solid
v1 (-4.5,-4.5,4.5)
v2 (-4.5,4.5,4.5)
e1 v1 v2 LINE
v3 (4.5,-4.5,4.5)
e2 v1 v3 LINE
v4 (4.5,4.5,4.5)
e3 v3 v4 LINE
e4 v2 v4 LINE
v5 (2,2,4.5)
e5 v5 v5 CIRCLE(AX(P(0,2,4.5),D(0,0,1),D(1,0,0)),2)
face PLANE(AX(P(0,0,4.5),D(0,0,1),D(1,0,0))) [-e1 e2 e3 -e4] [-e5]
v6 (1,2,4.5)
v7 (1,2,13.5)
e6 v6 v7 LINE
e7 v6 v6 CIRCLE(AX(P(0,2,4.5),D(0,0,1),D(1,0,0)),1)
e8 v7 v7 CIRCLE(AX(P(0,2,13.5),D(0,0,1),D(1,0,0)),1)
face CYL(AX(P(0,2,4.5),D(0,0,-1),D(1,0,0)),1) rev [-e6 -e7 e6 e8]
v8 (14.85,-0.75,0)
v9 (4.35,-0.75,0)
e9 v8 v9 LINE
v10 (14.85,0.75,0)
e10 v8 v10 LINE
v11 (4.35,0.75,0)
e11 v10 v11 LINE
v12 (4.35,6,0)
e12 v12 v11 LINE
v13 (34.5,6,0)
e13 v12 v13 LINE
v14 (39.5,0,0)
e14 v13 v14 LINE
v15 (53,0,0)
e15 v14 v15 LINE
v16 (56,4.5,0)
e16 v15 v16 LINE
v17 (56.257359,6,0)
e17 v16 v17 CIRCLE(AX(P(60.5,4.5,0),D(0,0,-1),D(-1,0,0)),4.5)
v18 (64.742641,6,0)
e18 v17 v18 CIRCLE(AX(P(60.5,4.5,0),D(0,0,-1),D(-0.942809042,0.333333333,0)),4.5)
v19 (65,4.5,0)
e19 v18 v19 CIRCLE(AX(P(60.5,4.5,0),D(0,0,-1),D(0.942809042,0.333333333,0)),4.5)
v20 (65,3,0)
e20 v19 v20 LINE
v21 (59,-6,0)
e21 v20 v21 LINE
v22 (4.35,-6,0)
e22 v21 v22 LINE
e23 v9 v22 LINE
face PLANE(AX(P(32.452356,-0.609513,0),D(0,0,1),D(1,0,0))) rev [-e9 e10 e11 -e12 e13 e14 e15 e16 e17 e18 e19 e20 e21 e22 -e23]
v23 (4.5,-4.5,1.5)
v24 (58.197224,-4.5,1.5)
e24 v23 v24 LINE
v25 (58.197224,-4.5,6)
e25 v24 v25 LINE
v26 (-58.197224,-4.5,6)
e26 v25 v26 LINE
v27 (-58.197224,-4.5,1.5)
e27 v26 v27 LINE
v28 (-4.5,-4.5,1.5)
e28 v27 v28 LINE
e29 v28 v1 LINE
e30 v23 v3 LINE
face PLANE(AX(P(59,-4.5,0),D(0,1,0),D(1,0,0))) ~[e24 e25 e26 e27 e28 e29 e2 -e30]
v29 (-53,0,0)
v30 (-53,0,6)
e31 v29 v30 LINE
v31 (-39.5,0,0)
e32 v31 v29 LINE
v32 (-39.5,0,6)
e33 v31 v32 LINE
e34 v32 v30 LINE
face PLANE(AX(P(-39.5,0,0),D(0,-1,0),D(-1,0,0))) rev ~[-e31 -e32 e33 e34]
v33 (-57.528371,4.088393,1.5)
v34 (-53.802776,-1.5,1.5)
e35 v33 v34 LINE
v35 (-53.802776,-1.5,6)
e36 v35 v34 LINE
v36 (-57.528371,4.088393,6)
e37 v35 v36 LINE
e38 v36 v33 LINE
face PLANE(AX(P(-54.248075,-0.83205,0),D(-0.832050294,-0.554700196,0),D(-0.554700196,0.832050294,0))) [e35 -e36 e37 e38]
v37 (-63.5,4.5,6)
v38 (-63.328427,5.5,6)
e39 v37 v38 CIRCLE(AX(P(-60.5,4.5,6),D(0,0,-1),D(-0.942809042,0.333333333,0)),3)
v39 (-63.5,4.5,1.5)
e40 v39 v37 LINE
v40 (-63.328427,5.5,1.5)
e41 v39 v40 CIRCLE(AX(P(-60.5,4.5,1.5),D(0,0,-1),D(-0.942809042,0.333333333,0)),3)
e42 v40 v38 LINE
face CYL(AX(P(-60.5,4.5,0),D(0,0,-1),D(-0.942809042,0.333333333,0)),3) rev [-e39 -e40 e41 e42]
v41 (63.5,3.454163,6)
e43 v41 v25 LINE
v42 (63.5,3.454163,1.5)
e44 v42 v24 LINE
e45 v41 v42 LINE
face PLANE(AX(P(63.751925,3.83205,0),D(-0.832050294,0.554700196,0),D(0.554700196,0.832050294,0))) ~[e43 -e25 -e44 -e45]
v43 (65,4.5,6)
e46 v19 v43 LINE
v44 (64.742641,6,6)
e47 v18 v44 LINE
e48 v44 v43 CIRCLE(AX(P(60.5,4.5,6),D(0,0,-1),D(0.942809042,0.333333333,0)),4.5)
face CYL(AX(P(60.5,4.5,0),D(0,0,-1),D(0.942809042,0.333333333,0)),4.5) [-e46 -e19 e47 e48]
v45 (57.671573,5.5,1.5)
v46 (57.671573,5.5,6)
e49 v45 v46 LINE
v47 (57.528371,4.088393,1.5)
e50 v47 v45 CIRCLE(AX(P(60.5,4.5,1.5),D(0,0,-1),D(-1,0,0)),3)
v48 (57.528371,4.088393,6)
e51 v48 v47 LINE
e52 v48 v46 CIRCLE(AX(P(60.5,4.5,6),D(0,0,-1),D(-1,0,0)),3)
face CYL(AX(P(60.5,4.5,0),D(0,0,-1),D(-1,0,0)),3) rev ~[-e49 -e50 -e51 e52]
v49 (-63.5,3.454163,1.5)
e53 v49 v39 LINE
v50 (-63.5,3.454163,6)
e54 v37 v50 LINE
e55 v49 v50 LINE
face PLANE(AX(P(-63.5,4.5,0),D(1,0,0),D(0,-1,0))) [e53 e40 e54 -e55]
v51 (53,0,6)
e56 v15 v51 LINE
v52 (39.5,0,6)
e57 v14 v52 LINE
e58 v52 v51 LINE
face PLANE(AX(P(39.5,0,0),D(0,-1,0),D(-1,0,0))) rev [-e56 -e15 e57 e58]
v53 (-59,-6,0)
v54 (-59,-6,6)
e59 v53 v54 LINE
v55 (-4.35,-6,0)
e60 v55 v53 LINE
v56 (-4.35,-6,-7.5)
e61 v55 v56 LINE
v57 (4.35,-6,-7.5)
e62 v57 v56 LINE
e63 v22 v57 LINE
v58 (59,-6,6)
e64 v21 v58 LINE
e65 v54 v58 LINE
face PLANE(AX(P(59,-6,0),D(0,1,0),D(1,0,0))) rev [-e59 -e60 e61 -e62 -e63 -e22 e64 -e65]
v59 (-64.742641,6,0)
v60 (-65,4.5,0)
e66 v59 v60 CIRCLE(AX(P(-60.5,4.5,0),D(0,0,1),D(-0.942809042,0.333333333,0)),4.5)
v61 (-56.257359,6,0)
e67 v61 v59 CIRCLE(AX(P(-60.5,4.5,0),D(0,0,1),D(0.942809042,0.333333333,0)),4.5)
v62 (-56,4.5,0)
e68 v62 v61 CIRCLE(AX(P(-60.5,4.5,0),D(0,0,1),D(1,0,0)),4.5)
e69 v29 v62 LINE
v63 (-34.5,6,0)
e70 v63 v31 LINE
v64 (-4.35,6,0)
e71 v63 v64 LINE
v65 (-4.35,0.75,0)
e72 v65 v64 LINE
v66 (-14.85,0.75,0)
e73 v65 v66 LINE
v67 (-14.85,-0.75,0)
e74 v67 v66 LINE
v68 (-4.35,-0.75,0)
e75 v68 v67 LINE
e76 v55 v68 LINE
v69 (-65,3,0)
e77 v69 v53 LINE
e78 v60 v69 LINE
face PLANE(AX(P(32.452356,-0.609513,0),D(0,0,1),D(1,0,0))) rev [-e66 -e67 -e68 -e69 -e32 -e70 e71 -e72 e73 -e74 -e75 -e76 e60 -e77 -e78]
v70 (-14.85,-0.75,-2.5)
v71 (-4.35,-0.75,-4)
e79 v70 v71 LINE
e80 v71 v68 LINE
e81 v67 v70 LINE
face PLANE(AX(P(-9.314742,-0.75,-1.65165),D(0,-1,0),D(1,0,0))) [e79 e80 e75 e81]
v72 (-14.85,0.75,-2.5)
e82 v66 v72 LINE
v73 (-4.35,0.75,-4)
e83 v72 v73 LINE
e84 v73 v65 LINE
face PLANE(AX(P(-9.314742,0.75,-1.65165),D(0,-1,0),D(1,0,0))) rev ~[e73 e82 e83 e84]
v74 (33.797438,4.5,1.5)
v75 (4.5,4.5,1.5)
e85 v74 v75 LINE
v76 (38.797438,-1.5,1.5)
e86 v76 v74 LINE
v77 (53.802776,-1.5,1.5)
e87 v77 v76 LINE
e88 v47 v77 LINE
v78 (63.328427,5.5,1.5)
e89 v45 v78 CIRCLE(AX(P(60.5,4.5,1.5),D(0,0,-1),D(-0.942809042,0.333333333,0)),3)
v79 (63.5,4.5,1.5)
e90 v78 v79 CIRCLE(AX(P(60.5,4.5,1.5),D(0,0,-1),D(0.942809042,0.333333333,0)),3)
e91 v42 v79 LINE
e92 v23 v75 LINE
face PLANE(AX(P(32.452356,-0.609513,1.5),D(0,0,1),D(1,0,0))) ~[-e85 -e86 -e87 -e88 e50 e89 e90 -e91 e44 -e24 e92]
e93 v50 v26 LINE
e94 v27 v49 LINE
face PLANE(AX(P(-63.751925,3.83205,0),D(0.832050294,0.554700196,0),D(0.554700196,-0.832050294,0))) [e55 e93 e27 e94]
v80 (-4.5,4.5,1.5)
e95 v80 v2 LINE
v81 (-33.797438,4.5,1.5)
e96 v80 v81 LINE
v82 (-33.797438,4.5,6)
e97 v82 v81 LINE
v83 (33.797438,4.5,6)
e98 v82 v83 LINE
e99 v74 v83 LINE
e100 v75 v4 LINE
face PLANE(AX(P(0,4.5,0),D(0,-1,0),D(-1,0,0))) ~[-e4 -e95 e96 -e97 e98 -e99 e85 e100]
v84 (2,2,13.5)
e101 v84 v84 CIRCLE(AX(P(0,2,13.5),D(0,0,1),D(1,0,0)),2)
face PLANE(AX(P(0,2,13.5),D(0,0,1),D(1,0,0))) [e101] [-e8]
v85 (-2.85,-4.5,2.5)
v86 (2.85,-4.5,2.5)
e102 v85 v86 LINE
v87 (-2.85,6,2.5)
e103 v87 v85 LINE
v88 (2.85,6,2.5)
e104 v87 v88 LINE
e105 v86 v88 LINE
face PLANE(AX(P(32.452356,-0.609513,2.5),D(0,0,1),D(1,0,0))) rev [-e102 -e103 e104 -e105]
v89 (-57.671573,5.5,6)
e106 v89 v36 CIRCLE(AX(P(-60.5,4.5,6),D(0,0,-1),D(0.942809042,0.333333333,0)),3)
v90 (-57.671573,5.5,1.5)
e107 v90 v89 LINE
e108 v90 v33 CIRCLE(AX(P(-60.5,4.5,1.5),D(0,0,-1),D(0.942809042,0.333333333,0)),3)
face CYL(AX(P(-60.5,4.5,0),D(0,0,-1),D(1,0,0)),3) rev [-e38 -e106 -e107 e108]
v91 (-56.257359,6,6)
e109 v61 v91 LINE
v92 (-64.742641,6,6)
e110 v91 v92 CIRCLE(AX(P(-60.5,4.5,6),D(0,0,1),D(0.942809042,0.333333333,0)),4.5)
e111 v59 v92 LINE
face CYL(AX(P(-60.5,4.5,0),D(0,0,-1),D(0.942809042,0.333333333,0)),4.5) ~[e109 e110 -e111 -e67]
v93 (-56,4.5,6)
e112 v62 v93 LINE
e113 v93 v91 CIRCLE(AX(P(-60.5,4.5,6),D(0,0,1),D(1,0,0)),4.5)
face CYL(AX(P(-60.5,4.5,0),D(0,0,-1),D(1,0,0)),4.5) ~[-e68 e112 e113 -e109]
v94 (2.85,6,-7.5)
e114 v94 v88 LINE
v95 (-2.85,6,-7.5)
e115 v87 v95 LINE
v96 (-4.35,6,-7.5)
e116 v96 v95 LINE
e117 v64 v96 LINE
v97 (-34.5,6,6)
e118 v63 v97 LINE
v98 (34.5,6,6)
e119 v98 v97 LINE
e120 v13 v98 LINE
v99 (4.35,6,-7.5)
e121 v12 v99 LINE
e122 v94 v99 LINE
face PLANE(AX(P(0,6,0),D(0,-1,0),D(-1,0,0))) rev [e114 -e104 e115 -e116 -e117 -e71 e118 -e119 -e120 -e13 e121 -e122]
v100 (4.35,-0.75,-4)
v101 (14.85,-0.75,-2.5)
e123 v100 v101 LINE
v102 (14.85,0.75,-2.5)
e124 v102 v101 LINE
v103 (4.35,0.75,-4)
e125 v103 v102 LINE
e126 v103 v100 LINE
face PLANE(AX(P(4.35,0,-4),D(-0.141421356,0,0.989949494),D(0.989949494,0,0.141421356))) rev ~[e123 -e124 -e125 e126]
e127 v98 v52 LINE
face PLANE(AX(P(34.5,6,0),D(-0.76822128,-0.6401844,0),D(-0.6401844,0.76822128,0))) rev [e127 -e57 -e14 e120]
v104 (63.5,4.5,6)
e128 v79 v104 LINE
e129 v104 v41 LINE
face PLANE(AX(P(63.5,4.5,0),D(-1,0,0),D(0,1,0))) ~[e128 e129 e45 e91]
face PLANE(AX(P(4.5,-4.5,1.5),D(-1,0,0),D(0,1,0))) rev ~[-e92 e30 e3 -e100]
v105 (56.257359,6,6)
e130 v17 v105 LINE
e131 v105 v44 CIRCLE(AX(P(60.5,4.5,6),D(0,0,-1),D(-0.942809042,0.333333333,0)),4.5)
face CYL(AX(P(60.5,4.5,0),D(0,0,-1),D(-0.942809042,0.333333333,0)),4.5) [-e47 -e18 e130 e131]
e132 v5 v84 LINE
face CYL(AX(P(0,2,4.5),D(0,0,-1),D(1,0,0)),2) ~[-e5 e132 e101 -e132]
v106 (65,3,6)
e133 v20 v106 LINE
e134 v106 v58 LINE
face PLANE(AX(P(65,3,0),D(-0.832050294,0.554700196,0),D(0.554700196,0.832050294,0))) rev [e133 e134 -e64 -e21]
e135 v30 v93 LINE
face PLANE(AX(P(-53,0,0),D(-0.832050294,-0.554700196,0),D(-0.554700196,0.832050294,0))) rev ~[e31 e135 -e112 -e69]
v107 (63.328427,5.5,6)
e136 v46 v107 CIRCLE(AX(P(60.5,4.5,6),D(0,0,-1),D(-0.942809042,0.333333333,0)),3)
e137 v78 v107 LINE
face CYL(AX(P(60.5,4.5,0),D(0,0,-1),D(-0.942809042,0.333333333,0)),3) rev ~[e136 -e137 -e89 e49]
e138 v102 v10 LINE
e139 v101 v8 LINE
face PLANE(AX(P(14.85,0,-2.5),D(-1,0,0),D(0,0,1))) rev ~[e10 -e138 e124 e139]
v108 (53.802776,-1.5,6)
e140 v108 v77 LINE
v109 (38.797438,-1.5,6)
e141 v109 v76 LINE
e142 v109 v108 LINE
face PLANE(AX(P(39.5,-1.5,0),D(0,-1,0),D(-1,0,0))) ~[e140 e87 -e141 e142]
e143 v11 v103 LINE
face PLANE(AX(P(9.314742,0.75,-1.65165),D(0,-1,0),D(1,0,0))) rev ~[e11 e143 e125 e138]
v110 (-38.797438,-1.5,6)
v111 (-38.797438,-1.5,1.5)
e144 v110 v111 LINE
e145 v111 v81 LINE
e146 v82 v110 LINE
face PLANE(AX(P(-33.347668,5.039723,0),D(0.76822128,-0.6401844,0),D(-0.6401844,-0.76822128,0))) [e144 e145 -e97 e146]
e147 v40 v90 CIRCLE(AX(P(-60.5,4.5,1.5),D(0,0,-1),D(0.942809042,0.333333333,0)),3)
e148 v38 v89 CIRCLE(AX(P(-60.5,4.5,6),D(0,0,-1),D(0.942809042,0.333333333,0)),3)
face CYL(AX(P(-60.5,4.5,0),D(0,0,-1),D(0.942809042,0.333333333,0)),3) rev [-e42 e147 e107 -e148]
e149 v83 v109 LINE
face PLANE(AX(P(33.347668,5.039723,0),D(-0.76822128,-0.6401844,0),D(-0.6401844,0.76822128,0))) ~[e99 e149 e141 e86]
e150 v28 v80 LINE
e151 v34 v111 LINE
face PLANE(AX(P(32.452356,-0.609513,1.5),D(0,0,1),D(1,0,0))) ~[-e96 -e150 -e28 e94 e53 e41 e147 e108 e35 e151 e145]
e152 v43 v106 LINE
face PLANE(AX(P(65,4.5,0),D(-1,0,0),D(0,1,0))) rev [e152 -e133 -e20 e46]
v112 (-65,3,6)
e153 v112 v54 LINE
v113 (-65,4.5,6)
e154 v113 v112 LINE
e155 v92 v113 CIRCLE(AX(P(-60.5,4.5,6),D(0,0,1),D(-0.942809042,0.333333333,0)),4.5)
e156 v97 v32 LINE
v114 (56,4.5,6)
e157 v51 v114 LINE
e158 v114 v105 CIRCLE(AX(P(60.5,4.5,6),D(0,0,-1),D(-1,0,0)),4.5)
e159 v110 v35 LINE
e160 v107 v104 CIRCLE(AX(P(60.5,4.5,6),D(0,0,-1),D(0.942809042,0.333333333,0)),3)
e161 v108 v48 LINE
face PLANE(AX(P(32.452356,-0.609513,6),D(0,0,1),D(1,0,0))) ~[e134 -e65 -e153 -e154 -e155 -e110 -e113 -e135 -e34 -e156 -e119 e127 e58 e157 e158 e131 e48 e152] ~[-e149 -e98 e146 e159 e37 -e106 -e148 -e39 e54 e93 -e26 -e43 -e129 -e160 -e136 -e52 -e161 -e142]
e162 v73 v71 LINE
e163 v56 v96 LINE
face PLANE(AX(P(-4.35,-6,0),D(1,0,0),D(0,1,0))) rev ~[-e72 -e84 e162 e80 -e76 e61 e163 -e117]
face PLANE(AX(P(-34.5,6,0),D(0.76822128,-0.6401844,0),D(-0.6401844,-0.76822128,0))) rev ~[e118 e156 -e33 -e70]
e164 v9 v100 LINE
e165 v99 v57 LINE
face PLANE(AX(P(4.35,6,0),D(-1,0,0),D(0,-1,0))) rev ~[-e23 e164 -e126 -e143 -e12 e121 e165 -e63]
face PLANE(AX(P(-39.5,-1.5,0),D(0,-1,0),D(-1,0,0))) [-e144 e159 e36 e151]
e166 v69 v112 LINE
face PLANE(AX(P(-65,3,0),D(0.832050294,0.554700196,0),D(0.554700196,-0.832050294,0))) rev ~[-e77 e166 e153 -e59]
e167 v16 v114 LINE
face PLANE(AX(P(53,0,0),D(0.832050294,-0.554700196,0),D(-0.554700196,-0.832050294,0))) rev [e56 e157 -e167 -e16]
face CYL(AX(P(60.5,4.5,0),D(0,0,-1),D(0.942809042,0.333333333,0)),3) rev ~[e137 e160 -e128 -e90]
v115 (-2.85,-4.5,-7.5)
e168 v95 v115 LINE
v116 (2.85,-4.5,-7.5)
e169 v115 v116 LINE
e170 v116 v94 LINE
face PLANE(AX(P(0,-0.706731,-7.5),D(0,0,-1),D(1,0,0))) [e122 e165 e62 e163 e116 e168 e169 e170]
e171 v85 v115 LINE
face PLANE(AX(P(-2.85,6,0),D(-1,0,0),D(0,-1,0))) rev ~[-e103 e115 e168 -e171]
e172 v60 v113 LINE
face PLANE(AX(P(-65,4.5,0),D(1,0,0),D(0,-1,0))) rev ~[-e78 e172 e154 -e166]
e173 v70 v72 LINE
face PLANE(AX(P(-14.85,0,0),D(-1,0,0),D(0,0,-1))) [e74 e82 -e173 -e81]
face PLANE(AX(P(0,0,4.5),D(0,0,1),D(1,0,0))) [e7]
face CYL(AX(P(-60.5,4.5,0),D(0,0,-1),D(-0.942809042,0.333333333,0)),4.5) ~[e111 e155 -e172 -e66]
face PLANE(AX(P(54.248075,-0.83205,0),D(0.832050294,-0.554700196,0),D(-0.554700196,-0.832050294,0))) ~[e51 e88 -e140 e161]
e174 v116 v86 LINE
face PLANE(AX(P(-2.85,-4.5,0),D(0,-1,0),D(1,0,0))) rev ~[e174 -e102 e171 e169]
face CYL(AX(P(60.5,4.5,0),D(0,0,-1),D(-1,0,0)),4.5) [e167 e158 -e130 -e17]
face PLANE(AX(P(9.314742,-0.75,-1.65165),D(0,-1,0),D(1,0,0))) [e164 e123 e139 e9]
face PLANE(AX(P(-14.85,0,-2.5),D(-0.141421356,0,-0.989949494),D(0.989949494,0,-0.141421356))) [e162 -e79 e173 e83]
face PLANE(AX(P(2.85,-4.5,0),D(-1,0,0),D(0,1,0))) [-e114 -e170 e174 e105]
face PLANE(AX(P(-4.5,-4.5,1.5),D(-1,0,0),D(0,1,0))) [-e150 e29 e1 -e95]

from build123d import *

# Parameters (mm, degrees)
F1_DEPTH  = 6
F3_T      = -1.5
F4_R      = 1
F5_DEPTH  = 26
F6_W      = 9
F6_H      = 9
F7_DEPTH  = 3
F8_R      = 2
F8_R_2    = 1
F9_DEPTH  = 9
F11_DEPTH = 7.5
F12_DEPTH = 2.5
F14_DEPTH = 0.75


# Not quite as in the source:
# - a feature names something its author has since deleted; it is built from what else it names


with BuildPart() as f1:
    # F0 (on Top) → F1 (new body)
    with BuildSketch(Plane.XY):
        with BuildLine():
            Line((-65, 4.5), (-65, 3))
            Line((-65, 3), (-59, -6))
            Line((-59, -6), (0, -6))
            Line((0, -6), (0, 6))
            Line((0, 6), (-34.5, 6))
            Line((-34.5, 6), (-39.5, 0))
            Line((-39.5, 0), (-53, 0))
            Line((-53, 0), (-56, 4.5))
            ThreePointArc((-56, 4.5), (-60.5, 0), (-65, 4.5))
        make_face()
        with BuildLine():
            ThreePointArc((-64.7426406871, 6), (-64.9351935184, 5.2609589043), (-65, 4.5))
            ThreePointArc((-65, 4.5), (-60.5, 0), (-56, 4.5))
            ThreePointArc((-56, 4.5), (-56.0648064816, 5.2609589043), (-56.2573593129, 6))
            Line((-56.2573593129, 6), (-64.7426406871, 6))
        make_face()
        with BuildLine():
            ThreePointArc((-56.2573593129, 6), (-60.5, 9), (-64.7426406871, 6))
            Line((-64.7426406871, 6), (-56.2573593129, 6))
        make_face()
    extrude(amount=F1_DEPTH)

    # F2: F1 across plane


with BuildPart() as f1_1:
    add(f1.part)
    add(f1.part.mirror(Plane.YZ))

    # F3
    f3_openings = [f1_1.faces().sort_by_distance(p)[0] for p in [
        (0, -0.200074, 6),
    ]]
    offset(amount=F3_T, openings=f3_openings, kind=Kind.INTERSECTION)

    # F4 (on face) → F5 (cut)
    with BuildSketch(Plane.XY.offset(1.5)):
        with BuildLine():
            ThreePointArc((-57.5283708886, 4.0883928763), (-57.5071011265, 4.2937081366), (-57.5, 4.5))
            ThreePointArc((-57.5, 4.5), (-60.5, 7.5), (-63.5, 4.5))
            ThreePointArc((-63.5, 4.5), (-60.7062918634, 1.5071011265), (-57.5283708886, 4.0883928763))
        make_face()
        with Locations((-60.5, 4.5)):
            Circle(F4_R, mode=Mode.SUBTRACT)
    extrude(amount=F5_DEPTH, mode=Mode.SUBTRACT)

    # F6 (on face) → F7 (join)
    with BuildSketch(Plane.XY.offset(1.5)):
        Rectangle(F6_W, F6_H)
    extrude(amount=F7_DEPTH)

    # F8 (on face) → F9 (join)
    with BuildSketch(Plane.XY.offset(4.5)):
        with Locations((0, 2)):
            Circle(F8_R)
        with Locations((0, 2)):
            Circle(F8_R_2, mode=Mode.SUBTRACT)
    extrude(amount=F9_DEPTH)

    # F10 (on face) → F11 (join)
    with BuildSketch(Plane(origin=(0, 0, 0), x_dir=(1, 0, 0), z_dir=(0, 0, -1))):
        Polygon((4.35, 6), (-4.35, 6), (-4.35, -6), (-2.85, -6), (-2.85, 4.5), (2.85, 4.5), (2.85, -6), (4.35, -6), align=None)
    extrude(amount=F11_DEPTH)

    # F12 (cut): a face of the model
    f12_faces = [f1_1.faces().sort_by_distance(p)[0] for p in [
        (0, 0.75, 0),
    ]]
    extrude(f12_faces, amount=-F12_DEPTH, mode=Mode.SUBTRACT)

    # F13 (on Front) → F14 (join, symmetric)
    with BuildSketch(Plane.XZ):
        Polygon((4.35, 0), (4.35, -4), (14.85, -2.5), (14.85, 0), align=None)
        Polygon((-14.85, -2.5), (-4.35, -4), (-4.35, 0), (-14.85, 0), align=None)
    extrude(amount=F14_DEPTH, both=True)


solid = f1_1.part
